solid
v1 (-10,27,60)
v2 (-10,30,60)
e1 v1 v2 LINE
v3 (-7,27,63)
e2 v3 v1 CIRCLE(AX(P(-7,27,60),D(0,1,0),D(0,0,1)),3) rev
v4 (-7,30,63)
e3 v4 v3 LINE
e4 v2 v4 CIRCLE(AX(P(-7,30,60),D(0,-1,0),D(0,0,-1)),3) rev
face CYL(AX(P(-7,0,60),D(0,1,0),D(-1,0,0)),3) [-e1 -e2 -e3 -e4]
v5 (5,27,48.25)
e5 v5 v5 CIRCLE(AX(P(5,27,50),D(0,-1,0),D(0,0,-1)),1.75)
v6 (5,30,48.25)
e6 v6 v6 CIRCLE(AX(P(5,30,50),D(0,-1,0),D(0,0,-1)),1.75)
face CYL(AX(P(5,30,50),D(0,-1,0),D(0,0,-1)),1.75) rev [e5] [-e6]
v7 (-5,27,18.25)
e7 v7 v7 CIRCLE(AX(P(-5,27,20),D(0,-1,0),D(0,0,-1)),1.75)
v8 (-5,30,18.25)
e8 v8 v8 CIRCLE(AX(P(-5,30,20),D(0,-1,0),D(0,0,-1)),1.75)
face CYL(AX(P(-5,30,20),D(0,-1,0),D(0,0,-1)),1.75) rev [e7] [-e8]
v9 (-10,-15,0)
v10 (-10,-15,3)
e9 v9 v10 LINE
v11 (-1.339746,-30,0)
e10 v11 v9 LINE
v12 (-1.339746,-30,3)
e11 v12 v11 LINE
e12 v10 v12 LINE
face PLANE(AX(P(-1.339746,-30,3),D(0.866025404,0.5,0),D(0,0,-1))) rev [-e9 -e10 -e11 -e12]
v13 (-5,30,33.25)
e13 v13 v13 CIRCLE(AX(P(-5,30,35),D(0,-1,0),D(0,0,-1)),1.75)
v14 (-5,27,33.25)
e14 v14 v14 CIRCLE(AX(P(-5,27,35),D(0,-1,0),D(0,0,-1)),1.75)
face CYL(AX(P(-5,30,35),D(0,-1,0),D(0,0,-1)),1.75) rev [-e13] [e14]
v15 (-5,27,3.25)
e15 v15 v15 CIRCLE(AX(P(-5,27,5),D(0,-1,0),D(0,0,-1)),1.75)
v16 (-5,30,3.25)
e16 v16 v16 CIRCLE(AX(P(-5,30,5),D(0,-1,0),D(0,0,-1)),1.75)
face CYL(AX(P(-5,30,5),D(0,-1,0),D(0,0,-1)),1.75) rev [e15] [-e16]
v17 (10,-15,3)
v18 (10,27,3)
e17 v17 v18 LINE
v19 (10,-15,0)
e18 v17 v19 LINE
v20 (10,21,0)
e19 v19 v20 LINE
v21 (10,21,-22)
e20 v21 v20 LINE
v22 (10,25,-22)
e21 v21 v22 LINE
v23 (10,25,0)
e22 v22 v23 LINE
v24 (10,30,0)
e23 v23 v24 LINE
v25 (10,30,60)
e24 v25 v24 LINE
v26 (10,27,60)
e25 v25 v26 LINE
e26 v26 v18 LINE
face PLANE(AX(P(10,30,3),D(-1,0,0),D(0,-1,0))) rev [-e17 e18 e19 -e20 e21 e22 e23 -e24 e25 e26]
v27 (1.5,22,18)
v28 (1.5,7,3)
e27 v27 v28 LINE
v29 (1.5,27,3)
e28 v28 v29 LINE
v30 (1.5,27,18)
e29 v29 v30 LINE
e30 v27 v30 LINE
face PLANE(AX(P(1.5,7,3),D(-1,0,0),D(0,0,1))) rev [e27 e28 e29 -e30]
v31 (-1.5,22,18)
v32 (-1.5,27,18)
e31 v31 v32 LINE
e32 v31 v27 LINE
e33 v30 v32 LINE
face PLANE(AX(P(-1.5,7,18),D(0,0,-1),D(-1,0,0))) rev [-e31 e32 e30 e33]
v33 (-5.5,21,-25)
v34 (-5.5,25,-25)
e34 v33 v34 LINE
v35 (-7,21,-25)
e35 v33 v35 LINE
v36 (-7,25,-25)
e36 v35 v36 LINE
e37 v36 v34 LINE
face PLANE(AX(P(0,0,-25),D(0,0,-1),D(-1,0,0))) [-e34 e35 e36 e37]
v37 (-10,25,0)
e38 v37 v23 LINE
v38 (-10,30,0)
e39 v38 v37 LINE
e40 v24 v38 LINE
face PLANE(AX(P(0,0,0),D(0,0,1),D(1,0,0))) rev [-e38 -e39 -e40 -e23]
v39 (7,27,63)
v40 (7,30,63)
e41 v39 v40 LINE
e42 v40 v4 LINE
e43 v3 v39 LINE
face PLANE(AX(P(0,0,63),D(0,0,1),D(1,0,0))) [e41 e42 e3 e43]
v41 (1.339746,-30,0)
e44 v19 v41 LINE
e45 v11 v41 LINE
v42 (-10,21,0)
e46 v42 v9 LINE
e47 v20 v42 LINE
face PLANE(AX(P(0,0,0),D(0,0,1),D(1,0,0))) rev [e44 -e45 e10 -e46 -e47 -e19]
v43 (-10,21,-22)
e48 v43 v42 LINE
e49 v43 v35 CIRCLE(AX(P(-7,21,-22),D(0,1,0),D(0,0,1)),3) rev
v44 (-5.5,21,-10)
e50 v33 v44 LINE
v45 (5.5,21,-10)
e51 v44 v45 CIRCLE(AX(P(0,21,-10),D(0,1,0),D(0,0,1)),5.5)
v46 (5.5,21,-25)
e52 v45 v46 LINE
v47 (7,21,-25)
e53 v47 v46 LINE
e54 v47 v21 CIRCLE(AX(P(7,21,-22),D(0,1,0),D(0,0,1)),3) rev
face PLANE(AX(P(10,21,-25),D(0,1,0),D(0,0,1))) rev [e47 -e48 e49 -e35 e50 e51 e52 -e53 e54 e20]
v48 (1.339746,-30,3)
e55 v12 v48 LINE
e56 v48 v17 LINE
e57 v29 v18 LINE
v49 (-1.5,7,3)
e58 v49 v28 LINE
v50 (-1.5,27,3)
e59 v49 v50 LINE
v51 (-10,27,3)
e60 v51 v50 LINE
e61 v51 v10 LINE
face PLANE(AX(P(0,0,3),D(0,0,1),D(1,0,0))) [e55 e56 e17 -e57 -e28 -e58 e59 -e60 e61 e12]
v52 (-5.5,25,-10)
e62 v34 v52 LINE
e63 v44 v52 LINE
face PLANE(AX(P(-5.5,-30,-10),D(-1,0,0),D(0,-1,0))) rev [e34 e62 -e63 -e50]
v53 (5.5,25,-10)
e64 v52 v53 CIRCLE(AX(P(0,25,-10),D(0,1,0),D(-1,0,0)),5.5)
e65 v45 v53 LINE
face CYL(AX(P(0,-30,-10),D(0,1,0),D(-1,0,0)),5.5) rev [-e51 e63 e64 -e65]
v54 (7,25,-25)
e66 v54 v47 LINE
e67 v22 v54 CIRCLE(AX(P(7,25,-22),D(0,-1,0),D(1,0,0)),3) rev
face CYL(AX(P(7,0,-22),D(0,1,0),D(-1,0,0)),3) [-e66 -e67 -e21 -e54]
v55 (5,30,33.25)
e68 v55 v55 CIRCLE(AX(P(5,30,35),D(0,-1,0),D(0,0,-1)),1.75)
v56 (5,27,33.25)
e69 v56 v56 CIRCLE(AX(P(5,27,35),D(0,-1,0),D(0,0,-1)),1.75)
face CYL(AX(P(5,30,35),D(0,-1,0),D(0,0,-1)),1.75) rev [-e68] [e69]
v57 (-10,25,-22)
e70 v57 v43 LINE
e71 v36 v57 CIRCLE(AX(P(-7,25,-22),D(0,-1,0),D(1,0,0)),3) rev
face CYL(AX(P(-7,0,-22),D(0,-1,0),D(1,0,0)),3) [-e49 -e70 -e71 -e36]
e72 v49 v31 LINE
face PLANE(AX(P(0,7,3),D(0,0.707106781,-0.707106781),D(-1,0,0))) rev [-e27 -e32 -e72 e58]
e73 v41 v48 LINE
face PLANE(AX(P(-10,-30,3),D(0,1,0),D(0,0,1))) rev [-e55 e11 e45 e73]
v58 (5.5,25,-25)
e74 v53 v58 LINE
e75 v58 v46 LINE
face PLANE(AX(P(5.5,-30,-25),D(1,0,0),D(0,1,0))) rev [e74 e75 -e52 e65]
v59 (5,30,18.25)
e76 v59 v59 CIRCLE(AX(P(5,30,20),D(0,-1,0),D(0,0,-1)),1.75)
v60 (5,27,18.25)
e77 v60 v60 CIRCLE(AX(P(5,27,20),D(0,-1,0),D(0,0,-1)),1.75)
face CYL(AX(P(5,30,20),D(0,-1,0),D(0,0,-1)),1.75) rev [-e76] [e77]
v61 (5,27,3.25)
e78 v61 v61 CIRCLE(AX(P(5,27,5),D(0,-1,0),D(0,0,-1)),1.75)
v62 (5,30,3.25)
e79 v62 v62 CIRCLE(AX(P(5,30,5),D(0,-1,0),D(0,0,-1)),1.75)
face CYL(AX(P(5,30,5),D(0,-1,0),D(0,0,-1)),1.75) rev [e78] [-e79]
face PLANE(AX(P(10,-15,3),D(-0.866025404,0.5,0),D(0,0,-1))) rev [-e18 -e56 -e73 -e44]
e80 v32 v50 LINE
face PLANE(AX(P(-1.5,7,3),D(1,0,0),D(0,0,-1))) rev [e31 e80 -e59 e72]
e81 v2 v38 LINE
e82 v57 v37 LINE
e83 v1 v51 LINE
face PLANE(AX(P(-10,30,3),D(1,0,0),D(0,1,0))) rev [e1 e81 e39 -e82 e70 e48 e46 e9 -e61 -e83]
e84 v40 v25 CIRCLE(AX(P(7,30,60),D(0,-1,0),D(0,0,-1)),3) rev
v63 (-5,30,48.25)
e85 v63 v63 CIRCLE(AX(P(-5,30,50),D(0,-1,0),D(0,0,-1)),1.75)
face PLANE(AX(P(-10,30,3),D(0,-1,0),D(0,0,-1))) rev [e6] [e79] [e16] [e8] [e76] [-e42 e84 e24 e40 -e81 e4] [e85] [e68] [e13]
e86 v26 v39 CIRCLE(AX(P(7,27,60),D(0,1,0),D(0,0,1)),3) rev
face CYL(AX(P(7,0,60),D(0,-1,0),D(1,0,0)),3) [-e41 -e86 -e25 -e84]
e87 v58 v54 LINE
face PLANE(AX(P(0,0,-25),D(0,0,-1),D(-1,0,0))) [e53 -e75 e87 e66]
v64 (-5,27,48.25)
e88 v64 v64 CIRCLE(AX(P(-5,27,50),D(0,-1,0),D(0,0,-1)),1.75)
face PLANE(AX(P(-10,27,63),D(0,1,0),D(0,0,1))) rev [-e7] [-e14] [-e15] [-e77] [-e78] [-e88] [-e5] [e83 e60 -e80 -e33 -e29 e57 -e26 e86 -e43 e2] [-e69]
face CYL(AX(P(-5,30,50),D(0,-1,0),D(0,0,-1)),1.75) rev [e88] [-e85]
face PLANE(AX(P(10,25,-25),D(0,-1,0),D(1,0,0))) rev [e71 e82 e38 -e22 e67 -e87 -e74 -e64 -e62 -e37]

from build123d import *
from OCP.BRepFilletAPI import BRepFilletAPI_MakeChamfer

# Parameters (mm, degrees)
SKETCH1_W           = 20
SKETCH1_H           = 60
BOSS_EXTRUDE1_DEPTH = 3
SKETCH2_W           = 20
SKETCH2_H           = 3
BOSS_EXTRUDE2_DEPTH = 60
SKETCH3_W           = 3
SKETCH3_H           = 15
BOSS_EXTRUDE3_DEPTH = 20
CHAMFER1_SIZE       = 15
SKETCH4_R           = 1.75
CUT_EXTRUDE1_DEPTH  = 86.545309632
LPATTERN1_COUNT     = 4
LPATTERN1_PITCH     = 15
CHAMFER2_SIZE       = 15
CHAMFER2_SIZE2      = 8.660254038
FILLET1_R           = 3
SKETCH5_W           = 20
SKETCH5_H           = 4
BOSS_EXTRUDE4_DEPTH = 25
CUT_EXTRUDE2_DEPTH  = 85.225886757
FILLET2_R           = 3


with BuildPart() as part:
    # Sketch1 → Boss-Extrude1 (new body)
    with BuildSketch(Plane.XY):
        Rectangle(SKETCH1_W, SKETCH1_H)
    extrude(amount=BOSS_EXTRUDE1_DEPTH)

    # Sketch2 → Boss-Extrude2 (add)
    with BuildSketch(Plane.XY.offset(3)):
        with Locations((0, 28.5)):
            Rectangle(SKETCH2_W, SKETCH2_H)
    extrude(amount=BOSS_EXTRUDE2_DEPTH)

    # Sketch3 → Boss-Extrude3 (add)
    with BuildSketch(Plane.XZ.offset(-27)):
        with Locations((0, 10.5)):
            Rectangle(SKETCH3_W, SKETCH3_H)
    extrude(amount=BOSS_EXTRUDE3_DEPTH)

    # Chamfer1
    chamfer1_edges = [part.edges().sort_by_distance(p)[0] for p in [
        (0, 7, 18),
    ]]
    chamfer(chamfer1_edges, length=CHAMFER1_SIZE - 0.0001)  # a hair under: the kernel refuses the full size

    # Sketch4 → Cut-Extrude1 (cut, through all)
    with BuildSketch(Plane.XZ.offset(-27)):
        with Locations(Location((-5, 5, 0), (0, 0, 270))):
            Circle(SKETCH4_R)
        with Locations(Location((5, 5, 0), (0, 0, 270))):
            Circle(SKETCH4_R)
    cut_extrude1 = extrude(amount=-CUT_EXTRUDE1_DEPTH, mode=Mode.SUBTRACT)

    # LPattern1: Cut-Extrude1 ×4
    with Locations(*[(0, 0, i * LPATTERN1_PITCH) for i in range(1, LPATTERN1_COUNT)]):
        add(cut_extrude1, mode=Mode.SUBTRACT)

    # Chamfer2: one chamfer whose edges measure the first distance from different faces: ONE call of the kernel's chamfer builder (chamfer() names one face for all edges)
    chamfer2_edges_1 = [part.edges().sort_by_distance(p)[0] for p in [
        (10, -30, 1.5),
    ]]
    chamfer2_side_1 = [part.faces().sort_by_distance(p)[0] for p in [
        (10, 29.13, 31.5),
    ]]
    chamfer2_edges_2 = [part.edges().sort_by_distance(p)[0] for p in [
        (-10, -30, 1.5),
    ]]
    chamfer2_side_2 = [part.faces().sort_by_distance(p)[0] for p in [
        (-10, -29.13, 1.5),
    ]]
    chamfer2 = BRepFilletAPI_MakeChamfer(part.part.solid().wrapped)
    for e in chamfer2_edges_1:
        chamfer2.Add(CHAMFER2_SIZE, CHAMFER2_SIZE2, e.wrapped, chamfer2_side_1[0].wrapped)  # the first distance lies on this face
    for e in chamfer2_edges_2:
        chamfer2.Add(CHAMFER2_SIZE, CHAMFER2_SIZE2, e.wrapped, chamfer2_side_2[0].wrapped)  # the first distance lies on this face
    add(Compound.cast(chamfer2.Shape()), mode=Mode.REPLACE)

    # Fillet1
    fillet1_edges = [part.edges().sort_by_distance(p)[0] for p in [
        (-10, 28.5, 63),
        (10, 28.5, 63),
    ]]
    fillet(fillet1_edges, radius=FILLET1_R)

    # Sketch5 → Boss-Extrude4 (add)
    with BuildSketch(Plane(origin=(0, 0, 0), x_dir=(-1, 0, 0), z_dir=(0, 0, -1))):
        with Locations((0, 23)):
            Rectangle(SKETCH5_W, SKETCH5_H)
    extrude(amount=BOSS_EXTRUDE4_DEPTH)

    # Sketch6 → Cut-Extrude2 (cut, through all)
    with BuildSketch(Plane(origin=(0, 25, 0), x_dir=(1, 0, 0), z_dir=(0, 1, 0))):
        with BuildLine():
            Line((-5.5, 10), (-5.5, 25))
            Line((-5.5, 25), (5.5, 25))
            Line((5.5, 25), (5.5, 10))
            ThreePointArc((5.5, 10), (0, 4.5), (-5.5, 10))
        make_face()
    extrude(amount=-CUT_EXTRUDE2_DEPTH, mode=Mode.SUBTRACT)

    # Fillet2
    fillet2_edges = [part.edges().sort_by_distance(p)[0] for p in [
        (10, 23, -25),
        (-10, 23, -25),
    ]]
    fillet(fillet2_edges, radius=FILLET2_R)


solid = part.part
